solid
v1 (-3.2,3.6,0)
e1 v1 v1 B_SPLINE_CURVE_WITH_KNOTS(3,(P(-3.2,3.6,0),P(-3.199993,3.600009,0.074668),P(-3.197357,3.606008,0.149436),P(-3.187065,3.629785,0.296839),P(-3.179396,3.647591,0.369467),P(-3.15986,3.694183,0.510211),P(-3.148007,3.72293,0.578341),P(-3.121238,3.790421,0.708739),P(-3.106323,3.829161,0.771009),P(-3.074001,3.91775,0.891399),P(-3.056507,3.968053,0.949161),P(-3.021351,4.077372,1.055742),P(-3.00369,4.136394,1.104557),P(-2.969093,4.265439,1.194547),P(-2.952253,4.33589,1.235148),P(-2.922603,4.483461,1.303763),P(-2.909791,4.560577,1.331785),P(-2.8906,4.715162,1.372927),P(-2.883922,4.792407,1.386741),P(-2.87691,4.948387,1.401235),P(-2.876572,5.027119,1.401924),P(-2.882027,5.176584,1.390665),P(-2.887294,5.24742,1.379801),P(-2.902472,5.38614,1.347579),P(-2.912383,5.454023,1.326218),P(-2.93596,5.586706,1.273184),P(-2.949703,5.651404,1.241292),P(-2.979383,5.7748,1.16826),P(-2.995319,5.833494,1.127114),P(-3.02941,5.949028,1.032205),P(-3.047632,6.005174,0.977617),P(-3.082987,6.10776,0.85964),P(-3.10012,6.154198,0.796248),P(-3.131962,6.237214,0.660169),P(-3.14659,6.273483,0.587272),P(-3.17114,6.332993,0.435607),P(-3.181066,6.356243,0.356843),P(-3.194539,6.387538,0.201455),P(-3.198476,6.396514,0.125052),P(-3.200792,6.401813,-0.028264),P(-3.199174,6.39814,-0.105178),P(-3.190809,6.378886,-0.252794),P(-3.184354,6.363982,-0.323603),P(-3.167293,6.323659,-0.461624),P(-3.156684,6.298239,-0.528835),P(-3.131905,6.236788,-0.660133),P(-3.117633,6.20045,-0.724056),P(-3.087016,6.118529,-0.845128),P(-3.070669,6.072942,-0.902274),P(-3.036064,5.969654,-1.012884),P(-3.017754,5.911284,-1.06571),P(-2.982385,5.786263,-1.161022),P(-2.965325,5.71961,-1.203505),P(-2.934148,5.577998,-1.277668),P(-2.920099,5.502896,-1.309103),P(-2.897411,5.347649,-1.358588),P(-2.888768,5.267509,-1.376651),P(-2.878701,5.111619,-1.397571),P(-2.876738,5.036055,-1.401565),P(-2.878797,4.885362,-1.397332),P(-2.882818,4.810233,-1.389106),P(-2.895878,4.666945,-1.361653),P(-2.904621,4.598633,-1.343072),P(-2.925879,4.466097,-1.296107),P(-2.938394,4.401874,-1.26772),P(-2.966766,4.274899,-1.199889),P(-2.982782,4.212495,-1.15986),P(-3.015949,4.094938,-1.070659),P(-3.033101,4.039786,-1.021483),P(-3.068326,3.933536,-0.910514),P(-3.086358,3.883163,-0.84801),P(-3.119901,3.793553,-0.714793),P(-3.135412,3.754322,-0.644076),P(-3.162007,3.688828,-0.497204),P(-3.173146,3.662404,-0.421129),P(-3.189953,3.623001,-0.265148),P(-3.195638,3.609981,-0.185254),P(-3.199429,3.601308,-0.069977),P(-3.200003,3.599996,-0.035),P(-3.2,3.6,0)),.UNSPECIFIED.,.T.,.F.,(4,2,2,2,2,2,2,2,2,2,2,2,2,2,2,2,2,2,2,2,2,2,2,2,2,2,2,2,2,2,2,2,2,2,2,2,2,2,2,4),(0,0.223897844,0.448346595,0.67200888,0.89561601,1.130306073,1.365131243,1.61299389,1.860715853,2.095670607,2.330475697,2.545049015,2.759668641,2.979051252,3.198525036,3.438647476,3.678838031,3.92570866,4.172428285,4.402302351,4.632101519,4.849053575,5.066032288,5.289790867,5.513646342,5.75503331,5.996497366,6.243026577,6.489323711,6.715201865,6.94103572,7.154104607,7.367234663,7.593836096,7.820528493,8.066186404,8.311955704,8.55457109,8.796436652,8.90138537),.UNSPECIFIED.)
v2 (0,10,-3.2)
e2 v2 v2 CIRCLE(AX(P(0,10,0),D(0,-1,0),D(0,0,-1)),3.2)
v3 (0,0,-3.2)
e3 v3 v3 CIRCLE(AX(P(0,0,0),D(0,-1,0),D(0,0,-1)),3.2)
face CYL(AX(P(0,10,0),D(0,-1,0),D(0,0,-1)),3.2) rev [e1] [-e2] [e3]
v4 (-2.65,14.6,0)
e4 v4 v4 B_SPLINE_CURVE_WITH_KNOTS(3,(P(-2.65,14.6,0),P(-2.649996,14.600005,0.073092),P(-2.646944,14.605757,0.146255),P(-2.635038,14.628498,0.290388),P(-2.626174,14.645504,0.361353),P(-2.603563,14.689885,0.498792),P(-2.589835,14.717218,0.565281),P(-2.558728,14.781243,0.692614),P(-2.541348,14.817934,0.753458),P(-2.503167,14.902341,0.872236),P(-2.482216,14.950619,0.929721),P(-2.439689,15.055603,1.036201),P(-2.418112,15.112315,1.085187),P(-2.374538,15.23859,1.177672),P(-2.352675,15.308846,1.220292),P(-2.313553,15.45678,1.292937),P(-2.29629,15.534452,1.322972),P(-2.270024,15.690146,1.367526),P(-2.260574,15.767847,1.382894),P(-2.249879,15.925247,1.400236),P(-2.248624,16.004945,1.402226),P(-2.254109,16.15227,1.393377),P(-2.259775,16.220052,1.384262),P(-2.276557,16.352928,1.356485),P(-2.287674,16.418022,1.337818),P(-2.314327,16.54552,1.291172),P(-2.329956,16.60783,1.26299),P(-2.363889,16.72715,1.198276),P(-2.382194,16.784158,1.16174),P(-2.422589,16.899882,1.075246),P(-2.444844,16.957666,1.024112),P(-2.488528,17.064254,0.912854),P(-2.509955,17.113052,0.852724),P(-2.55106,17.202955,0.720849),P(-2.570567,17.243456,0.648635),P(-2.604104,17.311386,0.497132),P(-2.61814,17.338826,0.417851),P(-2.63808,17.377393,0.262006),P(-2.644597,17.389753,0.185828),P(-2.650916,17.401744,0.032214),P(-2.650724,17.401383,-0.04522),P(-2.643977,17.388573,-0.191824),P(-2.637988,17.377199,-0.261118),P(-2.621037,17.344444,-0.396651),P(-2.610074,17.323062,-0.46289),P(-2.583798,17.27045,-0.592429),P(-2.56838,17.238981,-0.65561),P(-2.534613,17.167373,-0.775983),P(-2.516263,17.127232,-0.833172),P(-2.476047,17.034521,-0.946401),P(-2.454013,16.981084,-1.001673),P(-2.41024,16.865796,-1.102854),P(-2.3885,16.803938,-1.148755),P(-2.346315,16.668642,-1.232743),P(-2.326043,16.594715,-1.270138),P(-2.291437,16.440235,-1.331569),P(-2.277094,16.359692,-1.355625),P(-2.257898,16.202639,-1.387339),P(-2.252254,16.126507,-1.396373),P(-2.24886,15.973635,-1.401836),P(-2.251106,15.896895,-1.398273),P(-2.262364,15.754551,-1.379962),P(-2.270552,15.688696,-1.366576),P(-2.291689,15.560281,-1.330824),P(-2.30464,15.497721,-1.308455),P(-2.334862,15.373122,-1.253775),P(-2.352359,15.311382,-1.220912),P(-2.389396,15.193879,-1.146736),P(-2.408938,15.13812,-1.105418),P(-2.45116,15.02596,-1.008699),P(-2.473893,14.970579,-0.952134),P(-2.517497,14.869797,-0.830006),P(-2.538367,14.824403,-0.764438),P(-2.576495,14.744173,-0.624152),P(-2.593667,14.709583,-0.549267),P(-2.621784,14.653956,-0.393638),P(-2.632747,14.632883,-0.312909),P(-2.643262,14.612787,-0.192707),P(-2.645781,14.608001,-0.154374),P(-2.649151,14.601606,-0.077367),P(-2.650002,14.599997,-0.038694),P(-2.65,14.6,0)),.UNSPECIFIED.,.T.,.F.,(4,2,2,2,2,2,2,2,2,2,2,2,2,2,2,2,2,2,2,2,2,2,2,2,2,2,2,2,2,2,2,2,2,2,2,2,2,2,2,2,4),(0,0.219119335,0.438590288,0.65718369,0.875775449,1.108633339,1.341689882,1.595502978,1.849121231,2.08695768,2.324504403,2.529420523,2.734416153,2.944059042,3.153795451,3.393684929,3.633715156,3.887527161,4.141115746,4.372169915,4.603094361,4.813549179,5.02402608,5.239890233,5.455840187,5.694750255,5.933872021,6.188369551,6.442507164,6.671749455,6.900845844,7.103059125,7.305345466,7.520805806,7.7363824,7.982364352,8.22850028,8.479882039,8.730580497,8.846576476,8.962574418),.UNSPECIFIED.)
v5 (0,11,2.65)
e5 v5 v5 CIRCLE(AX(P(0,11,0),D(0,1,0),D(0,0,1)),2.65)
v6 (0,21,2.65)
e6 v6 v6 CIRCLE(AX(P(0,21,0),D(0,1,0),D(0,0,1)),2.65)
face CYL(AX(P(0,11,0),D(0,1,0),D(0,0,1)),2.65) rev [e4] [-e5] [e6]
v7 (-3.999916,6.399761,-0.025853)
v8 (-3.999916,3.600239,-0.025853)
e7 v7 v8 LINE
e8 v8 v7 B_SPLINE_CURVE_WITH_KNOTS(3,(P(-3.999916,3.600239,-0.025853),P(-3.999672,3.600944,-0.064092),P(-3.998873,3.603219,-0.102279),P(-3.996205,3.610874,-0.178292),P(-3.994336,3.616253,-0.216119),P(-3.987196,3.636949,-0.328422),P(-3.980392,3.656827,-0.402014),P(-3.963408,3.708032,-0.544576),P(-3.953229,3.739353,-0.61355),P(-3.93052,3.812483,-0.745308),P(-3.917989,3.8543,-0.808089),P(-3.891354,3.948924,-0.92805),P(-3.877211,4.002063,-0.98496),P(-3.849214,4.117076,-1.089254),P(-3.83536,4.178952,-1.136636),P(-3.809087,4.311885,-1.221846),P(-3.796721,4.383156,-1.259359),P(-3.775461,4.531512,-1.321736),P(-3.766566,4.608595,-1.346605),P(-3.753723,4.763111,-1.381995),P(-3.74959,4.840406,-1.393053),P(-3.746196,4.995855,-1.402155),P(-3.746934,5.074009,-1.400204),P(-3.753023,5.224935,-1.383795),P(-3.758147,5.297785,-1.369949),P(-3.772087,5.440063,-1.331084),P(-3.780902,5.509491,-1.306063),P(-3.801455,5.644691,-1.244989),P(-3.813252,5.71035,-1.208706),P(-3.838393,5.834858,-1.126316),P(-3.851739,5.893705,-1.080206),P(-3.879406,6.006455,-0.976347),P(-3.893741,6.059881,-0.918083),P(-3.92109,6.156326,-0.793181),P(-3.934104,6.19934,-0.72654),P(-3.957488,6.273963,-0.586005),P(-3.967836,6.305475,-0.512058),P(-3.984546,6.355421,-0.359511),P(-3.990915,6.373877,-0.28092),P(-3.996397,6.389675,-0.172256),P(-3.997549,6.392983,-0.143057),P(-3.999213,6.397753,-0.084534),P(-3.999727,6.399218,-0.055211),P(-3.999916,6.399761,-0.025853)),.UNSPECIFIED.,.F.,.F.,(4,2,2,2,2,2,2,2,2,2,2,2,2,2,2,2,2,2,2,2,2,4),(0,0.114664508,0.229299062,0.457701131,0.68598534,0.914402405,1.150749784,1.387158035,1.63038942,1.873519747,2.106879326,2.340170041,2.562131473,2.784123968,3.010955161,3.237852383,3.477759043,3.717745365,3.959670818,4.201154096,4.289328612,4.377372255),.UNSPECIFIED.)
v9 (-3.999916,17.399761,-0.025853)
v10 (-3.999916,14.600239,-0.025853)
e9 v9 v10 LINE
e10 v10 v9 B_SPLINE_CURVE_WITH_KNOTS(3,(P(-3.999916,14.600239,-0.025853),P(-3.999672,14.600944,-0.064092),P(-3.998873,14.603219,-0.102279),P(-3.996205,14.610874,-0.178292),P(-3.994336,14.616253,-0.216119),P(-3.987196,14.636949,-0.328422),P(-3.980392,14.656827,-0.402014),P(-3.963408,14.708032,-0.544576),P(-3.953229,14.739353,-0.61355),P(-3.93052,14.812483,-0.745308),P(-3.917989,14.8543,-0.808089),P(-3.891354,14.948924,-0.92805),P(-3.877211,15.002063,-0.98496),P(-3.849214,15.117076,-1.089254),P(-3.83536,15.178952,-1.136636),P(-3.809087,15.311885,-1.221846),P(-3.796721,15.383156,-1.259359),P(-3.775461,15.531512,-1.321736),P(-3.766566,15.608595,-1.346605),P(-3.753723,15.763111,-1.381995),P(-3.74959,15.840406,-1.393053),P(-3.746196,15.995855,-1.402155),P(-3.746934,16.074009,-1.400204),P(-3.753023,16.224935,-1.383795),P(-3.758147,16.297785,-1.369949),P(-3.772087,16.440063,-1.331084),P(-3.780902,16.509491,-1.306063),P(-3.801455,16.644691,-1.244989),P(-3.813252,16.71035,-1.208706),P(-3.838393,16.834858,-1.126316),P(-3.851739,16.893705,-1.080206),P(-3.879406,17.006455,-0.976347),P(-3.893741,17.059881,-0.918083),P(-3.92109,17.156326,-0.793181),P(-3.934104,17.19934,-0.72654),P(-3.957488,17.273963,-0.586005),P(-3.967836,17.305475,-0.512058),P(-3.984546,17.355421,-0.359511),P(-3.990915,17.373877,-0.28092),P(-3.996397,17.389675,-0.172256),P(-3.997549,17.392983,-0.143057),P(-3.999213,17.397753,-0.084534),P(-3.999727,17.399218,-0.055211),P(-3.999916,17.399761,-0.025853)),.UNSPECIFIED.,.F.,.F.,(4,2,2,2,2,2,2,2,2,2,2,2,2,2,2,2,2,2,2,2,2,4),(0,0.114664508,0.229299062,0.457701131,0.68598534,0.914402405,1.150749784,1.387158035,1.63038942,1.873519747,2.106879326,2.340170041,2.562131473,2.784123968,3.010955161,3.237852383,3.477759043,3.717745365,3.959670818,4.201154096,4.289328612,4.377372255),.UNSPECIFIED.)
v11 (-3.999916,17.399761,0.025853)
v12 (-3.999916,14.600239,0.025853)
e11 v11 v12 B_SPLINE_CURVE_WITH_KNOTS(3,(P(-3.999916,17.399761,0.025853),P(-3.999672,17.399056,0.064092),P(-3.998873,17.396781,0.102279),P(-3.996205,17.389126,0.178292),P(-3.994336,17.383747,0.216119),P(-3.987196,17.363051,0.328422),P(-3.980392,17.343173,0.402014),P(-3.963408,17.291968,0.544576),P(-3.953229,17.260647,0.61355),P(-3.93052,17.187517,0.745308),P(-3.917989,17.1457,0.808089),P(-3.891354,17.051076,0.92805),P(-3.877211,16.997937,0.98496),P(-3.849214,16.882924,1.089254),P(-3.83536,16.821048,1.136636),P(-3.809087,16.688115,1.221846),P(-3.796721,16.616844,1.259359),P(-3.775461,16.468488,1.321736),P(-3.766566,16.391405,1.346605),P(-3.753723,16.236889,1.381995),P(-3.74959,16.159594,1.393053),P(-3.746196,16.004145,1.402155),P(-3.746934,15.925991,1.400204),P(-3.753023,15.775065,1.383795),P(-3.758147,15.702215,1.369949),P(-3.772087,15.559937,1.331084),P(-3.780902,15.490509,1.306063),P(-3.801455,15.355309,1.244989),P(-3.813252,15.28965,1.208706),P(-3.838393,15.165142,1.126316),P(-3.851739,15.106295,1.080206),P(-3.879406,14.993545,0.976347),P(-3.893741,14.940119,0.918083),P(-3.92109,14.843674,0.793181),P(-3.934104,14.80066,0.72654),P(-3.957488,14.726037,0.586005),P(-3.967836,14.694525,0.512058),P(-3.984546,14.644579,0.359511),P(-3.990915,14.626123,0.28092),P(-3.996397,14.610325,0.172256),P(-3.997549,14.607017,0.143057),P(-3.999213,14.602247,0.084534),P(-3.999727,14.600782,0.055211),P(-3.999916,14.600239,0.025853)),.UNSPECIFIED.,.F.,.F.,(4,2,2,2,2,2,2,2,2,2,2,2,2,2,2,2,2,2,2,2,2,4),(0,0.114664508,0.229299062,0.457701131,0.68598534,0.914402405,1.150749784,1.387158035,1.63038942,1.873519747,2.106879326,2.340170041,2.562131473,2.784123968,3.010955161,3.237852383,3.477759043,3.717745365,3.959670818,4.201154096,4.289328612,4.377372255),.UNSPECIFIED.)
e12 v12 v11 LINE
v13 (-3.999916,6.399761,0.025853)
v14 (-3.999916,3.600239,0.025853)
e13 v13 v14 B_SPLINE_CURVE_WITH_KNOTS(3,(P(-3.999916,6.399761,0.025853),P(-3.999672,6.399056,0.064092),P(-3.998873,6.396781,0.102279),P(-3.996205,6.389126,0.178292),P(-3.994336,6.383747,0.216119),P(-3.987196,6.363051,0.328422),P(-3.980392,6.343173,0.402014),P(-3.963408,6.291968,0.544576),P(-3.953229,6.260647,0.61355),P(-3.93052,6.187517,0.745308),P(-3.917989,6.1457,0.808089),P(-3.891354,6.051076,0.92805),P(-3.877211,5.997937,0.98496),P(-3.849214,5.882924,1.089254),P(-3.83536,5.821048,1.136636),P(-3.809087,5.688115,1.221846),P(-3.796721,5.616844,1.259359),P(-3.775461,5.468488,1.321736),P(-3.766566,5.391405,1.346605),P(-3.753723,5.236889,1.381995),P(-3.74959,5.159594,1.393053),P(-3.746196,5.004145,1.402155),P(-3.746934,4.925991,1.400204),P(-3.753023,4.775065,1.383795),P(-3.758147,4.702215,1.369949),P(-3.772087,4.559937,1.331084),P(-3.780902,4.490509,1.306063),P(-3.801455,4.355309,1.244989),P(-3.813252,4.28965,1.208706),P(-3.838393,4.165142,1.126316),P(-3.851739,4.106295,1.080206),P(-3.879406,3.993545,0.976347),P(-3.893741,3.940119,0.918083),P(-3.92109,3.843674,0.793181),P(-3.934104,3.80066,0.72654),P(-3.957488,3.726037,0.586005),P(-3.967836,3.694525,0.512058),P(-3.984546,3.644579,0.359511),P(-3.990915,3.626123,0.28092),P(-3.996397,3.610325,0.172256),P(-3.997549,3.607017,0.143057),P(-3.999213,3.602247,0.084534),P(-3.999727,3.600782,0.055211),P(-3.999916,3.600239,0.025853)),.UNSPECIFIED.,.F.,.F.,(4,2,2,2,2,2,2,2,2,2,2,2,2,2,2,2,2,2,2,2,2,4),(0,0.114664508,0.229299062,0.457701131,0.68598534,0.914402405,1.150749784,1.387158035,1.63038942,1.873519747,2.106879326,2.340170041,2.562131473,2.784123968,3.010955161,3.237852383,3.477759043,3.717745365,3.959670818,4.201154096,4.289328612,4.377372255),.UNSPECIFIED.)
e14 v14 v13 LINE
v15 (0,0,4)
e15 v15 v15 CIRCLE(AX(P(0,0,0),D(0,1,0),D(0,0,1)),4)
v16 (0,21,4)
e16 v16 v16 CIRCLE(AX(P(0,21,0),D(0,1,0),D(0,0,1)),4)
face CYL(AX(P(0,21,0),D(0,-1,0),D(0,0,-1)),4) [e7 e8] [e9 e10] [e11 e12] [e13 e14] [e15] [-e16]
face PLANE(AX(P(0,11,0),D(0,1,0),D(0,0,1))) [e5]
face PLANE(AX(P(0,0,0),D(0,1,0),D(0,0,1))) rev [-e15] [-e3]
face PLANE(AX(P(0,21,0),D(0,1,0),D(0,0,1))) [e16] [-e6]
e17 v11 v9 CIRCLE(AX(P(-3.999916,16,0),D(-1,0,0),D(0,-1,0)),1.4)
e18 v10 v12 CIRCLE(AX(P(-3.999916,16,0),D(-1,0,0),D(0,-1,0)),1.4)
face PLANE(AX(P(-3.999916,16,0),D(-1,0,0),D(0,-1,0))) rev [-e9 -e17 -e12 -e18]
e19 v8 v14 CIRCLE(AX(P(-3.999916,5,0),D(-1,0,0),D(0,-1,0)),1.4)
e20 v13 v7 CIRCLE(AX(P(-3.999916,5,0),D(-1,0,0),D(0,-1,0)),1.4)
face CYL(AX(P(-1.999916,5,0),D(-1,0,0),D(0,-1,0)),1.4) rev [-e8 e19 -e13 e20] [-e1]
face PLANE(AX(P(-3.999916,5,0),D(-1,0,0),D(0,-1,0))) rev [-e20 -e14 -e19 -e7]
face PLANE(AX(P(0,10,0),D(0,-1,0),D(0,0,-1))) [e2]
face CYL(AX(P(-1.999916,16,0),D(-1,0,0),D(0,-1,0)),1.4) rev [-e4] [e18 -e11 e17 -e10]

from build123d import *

# Parameters (mm, degrees)
SKETCH1_R           = 4
BOSS_EXTRUDE1_DEPTH = 21
SKETCH2_R           = 3.2
CUT_EXTRUDE1_DEPTH  = 10
SKETCH3_R           = 2.65
CUT_EXTRUDE3_DEPTH  = 10


with BuildPart() as part:
    # Sketch1 → Boss-Extrude1 (new body)
    with BuildSketch(Plane(origin=(0, 0, 0), x_dir=(1, 0, 0), z_dir=(0, 1, 0))):
        with Locations(Location((0, 0, 0), (0, 0, 90))):
            Circle(SKETCH1_R)
    extrude(amount=BOSS_EXTRUDE1_DEPTH)

    # Sketch2 → Cut-Extrude1 (cut)
    with BuildSketch(Plane.XZ):
        with Locations(Location((0, 0, 0), (0, 0, 270))):
            Circle(SKETCH2_R)
    extrude(amount=-CUT_EXTRUDE1_DEPTH, mode=Mode.SUBTRACT)

    # Sketch3 → Cut-Extrude3 (cut)
    with BuildSketch(Plane(origin=(0, 21, 0), x_dir=(1, 0, 0), z_dir=(0, 1, 0))):
        with Locations(Location((0, 0, 0), (0, 0, 270))):
            Circle(SKETCH3_R)
    extrude(amount=-CUT_EXTRUDE3_DEPTH, mode=Mode.SUBTRACT)

    # Cut-Extrude5: read off the stored shape, not the designer's step
    # Cut-Extrude5: loft between two sections, ruled curve by curve
    cut_extrude5_from = [
        Edge.make_three_point_arc((-2.24981464, 14.6, 0), (-2.24981464, 16, 1.4), (-2.24981464, 17.4, 0)),
        Edge.make_three_point_arc((-2.24981464, 17.4, 0), (-2.24981464, 16, -1.4), (-2.24981464, 14.6, 0)),
    ]
    cut_extrude5_to = [
        Edge.make_three_point_arc((-3.999916451, 14.6, 0), (-3.999916451, 16, 1.4), (-3.999916451, 17.4, 0)),
        Edge.make_three_point_arc((-3.999916451, 17.4, 0), (-3.999916451, 16, -1.4), (-3.999916451, 14.6, 0)),
    ]
    cut_extrude5 = Solid(Shell([*[Face.make_surface_from_curves(cut_extrude5_from[k], cut_extrude5_to[k]) for k in range(2)], Face(Wire(cut_extrude5_from)), Face(Wire(cut_extrude5_to))]))
    add(cut_extrude5, mode=Mode.SUBTRACT)

    # Cut-Extrude5 2: loft between two sections, ruled curve by curve
    cut_extrude5_2_from = [
        Edge.make_three_point_arc((-2.877351837, 3.6, 0), (-2.877351837, 5, 1.4), (-2.877351837, 6.4, 0)),
        Edge.make_three_point_arc((-2.877351837, 6.4, 0), (-2.877351837, 5, -1.4), (-2.877351837, 3.6, 0)),
    ]
    cut_extrude5_2_to = [
        Edge.make_three_point_arc((-3.999916451, 3.6, 0), (-3.999916451, 5, 1.4), (-3.999916451, 6.4, 0)),
        Edge.make_three_point_arc((-3.999916451, 6.4, 0), (-3.999916451, 5, -1.4), (-3.999916451, 3.6, 0)),
    ]
    cut_extrude5_2 = Solid(Shell([*[Face.make_surface_from_curves(cut_extrude5_2_from[k], cut_extrude5_2_to[k]) for k in range(2)], Face(Wire(cut_extrude5_2_from)), Face(Wire(cut_extrude5_2_to))]))
    add(cut_extrude5_2, mode=Mode.SUBTRACT)


solid = part.part
